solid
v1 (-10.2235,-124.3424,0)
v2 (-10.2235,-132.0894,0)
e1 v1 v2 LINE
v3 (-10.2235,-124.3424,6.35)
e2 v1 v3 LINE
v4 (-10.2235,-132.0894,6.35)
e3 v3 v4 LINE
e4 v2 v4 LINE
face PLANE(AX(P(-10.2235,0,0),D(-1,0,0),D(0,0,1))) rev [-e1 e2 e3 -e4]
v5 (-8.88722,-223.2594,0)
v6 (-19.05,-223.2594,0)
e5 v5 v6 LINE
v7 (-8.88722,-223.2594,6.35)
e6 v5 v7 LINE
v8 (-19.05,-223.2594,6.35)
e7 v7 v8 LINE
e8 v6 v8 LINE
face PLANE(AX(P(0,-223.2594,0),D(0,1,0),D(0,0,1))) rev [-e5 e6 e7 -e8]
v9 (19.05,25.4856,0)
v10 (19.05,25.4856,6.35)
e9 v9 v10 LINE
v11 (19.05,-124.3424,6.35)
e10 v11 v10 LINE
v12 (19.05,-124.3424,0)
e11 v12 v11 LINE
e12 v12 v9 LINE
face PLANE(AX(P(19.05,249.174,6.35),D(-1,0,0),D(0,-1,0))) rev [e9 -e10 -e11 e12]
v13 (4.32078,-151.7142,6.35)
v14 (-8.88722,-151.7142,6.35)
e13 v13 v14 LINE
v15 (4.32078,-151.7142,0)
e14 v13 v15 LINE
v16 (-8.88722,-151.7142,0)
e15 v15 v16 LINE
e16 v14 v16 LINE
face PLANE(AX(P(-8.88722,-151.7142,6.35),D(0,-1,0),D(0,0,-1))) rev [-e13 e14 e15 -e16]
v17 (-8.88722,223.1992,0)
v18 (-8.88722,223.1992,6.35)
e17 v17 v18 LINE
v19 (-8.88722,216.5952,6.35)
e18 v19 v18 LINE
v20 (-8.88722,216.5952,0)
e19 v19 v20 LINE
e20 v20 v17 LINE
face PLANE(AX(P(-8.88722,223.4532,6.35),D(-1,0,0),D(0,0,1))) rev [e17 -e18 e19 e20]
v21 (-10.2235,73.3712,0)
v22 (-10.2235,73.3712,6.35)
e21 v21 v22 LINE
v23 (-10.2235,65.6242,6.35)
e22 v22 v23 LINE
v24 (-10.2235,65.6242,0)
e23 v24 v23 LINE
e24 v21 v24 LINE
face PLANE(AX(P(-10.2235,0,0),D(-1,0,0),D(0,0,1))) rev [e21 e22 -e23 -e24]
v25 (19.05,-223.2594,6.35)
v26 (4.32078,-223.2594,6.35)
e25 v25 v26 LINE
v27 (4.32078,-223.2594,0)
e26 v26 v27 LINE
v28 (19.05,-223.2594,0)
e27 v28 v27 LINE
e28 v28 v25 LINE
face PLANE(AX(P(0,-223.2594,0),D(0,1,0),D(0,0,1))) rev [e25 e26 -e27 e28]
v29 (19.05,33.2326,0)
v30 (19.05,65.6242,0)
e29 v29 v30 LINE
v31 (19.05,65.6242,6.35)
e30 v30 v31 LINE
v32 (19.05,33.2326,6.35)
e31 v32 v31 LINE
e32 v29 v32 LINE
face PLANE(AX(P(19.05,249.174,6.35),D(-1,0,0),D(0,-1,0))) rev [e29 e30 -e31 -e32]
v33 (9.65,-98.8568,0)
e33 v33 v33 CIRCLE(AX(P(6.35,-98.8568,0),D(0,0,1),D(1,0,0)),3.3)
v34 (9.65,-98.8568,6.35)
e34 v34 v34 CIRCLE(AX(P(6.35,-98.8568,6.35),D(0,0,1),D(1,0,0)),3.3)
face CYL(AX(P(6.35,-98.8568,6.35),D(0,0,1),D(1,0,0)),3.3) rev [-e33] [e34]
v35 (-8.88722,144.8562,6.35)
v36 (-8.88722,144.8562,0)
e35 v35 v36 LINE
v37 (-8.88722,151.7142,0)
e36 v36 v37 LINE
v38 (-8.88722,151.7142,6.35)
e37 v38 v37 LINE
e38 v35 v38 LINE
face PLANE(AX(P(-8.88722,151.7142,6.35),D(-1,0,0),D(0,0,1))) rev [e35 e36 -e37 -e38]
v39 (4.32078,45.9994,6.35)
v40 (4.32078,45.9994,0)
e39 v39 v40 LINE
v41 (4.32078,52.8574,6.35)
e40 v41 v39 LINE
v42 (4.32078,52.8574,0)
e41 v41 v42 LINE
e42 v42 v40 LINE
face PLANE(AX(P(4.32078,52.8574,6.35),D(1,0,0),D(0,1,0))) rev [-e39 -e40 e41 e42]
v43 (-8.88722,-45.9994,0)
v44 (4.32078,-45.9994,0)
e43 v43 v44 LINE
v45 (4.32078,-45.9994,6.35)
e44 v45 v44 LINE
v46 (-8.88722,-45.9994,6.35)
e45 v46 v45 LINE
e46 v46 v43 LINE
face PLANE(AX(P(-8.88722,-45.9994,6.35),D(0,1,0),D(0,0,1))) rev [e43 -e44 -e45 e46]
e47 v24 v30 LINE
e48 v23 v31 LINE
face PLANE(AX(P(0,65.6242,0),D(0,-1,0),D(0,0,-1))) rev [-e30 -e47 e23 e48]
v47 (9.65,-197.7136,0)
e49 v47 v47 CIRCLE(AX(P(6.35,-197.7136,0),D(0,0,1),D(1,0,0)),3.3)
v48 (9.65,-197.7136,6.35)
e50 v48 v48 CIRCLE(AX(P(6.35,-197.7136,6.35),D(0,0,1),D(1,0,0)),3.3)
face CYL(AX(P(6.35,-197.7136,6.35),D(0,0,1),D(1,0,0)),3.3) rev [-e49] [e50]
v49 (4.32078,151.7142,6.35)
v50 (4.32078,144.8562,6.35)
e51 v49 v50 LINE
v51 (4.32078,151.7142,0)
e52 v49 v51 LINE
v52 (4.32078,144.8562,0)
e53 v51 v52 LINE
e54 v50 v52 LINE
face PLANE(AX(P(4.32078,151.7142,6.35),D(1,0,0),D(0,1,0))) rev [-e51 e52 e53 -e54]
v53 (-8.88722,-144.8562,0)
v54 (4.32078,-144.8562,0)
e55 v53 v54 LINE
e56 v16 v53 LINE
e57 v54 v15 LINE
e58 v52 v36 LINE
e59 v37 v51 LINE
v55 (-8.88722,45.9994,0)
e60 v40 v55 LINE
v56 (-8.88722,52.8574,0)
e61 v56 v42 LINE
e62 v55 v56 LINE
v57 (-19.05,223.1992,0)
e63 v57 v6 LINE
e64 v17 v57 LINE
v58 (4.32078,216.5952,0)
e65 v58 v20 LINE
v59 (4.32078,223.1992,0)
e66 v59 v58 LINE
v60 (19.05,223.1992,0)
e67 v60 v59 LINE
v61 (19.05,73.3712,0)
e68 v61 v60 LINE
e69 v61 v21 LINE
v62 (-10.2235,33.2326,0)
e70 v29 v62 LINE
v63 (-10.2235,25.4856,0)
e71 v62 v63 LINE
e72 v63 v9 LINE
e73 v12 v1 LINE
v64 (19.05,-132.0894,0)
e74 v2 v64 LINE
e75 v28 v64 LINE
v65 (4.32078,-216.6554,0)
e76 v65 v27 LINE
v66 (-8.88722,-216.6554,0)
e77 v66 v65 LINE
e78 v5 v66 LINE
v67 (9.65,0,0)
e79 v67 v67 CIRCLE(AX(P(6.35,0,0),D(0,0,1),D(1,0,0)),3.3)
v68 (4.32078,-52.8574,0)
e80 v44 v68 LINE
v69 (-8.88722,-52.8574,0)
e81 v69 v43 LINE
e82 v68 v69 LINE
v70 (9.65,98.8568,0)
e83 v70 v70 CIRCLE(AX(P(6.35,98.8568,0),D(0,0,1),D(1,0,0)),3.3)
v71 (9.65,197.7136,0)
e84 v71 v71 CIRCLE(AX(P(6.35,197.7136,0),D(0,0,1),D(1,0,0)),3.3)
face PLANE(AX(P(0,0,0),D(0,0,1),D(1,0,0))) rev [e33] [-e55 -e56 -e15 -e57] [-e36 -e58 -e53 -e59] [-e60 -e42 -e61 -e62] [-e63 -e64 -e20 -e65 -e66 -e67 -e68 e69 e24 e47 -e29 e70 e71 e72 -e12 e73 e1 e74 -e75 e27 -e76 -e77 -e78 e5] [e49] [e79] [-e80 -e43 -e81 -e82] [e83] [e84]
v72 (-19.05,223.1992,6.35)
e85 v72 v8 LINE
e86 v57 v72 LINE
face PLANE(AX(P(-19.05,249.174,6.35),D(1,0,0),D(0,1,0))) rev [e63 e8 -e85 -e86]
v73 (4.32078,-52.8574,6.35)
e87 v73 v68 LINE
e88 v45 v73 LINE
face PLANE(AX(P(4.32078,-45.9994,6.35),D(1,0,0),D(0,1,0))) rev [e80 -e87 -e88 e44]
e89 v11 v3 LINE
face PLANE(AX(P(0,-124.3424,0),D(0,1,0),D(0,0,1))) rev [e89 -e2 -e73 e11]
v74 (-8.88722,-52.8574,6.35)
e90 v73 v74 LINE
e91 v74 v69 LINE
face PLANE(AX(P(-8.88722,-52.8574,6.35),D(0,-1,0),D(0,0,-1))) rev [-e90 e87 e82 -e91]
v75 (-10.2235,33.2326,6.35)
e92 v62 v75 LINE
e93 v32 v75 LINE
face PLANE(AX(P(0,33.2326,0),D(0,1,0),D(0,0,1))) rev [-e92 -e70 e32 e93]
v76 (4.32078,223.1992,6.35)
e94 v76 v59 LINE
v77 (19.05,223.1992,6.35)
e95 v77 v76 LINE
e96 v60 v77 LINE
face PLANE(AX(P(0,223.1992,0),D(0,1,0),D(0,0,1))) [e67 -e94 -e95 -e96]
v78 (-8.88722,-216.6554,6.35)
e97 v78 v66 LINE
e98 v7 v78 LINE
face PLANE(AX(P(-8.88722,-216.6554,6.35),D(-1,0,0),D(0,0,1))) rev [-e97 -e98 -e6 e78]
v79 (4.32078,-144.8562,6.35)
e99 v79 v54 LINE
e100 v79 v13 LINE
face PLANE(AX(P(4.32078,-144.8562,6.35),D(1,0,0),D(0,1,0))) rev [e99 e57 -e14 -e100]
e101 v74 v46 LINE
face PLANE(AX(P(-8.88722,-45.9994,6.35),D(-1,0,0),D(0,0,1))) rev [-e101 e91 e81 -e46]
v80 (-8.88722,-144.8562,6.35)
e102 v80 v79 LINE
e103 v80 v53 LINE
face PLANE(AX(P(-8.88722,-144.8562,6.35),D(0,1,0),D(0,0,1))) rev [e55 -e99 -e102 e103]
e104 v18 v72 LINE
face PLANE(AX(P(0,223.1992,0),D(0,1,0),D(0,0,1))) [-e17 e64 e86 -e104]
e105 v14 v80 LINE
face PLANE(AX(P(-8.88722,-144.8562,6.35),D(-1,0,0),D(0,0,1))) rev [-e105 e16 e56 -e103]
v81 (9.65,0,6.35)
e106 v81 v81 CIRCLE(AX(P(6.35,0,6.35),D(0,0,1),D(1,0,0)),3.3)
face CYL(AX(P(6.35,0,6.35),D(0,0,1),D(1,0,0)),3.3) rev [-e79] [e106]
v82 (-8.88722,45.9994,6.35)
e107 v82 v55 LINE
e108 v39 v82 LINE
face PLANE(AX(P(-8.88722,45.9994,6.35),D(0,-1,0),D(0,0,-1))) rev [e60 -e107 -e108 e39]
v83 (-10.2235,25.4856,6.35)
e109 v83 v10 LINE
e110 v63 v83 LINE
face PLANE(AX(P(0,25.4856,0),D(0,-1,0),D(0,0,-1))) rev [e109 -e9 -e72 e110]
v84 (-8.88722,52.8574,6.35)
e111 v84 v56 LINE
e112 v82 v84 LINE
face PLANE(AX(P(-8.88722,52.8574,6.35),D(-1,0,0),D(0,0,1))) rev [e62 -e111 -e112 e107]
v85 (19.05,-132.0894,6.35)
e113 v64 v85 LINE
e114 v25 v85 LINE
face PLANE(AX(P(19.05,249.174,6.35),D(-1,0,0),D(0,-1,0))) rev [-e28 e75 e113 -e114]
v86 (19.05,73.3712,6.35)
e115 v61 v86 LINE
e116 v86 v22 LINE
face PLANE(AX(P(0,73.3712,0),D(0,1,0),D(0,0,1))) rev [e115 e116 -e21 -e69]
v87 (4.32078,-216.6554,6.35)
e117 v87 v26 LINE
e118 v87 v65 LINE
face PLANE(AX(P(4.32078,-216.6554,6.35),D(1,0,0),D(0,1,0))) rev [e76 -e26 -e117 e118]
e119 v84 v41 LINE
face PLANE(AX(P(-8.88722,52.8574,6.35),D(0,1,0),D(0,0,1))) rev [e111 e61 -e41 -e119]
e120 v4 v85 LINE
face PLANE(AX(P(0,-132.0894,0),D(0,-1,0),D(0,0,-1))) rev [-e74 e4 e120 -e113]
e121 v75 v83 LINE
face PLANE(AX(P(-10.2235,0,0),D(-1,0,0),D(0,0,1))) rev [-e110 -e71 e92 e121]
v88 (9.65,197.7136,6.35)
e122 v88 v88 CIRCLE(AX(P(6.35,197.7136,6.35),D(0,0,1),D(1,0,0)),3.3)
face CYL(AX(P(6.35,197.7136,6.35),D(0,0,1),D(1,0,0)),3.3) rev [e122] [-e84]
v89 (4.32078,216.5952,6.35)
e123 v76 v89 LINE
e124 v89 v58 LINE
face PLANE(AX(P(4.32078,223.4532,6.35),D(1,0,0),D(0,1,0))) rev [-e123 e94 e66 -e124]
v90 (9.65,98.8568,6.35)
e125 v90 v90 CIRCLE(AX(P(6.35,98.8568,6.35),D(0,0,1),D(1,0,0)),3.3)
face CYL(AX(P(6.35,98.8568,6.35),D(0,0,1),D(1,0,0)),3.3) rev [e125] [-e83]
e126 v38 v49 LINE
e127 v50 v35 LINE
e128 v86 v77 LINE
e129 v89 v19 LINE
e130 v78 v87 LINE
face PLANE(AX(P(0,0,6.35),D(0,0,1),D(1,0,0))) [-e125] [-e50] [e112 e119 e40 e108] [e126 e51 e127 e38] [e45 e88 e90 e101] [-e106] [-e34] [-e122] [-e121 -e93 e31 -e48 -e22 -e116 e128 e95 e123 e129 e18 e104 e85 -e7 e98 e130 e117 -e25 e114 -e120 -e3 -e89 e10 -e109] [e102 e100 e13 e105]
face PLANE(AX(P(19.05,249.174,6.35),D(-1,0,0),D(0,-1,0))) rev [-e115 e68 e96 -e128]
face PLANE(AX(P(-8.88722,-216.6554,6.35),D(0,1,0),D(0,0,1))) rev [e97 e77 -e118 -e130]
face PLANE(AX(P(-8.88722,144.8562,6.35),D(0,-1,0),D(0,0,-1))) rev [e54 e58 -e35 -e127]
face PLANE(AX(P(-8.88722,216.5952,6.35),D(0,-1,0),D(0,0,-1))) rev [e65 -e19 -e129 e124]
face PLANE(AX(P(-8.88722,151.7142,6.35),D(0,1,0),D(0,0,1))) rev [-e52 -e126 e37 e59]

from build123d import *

# Parameters (mm, degrees)
SKETCH1_W             = 38.1
SKETCH1_H             = 498.348
SKETCH1_R             = 3
BOSS_EXTRUDE1_DEPTH   = 6.35
M6_CLEARANCE_HOLE1_D  = 6.6
LPATTERN1_COUNT       = 3
LPATTERN1_PITCH       = 98.8568
LPATTERN1_COL_COUNT   = 3
LPATTERN1_COL_PITCH   = 98.8568
SKETCH4_W             = 26.9875
SKETCH4_H             = 3.175
SKETCH4_W_2           = 25.7175
CUT_EXTRUDE1_DEPTH    = 250.981813891
LPATTERN2_START       = -8.887219794
LPATTERN2_OUTLINE_W   = 6.858
LPATTERN2_OUTLINE_H   = 6.35
LPATTERN2_OUTLINE_W_2 = 6.604
LPATTERN2_DEPTH       = 13.208


# Read off the part's stored shape, not the designer's step: LPattern2
with BuildPart() as part:
    # Sketch1 → Boss-Extrude1 (new body)
    with BuildSketch(Plane.XY):
        Rectangle(SKETCH1_W, SKETCH1_H)
        with Locations((6.35, 0)):
            Circle(SKETCH1_R, mode=Mode.SUBTRACT)
    extrude(amount=BOSS_EXTRUDE1_DEPTH)

    # M6 Clearance Hole1 (through all)
    with Locations(Plane.XY.offset(6.35)):
        with Locations((6.35, 0)):
            m6_clearance_hole1 = Hole(M6_CLEARANCE_HOLE1_D / 2)

    # LPattern1: M6 Clearance Hole1 ×3
    with Locations(*[(0, -i * LPATTERN1_PITCH, 0) for i in range(1, LPATTERN1_COUNT)]):
        add(m6_clearance_hole1, mode=Mode.SUBTRACT)

    # LPattern1 col: M6 Clearance Hole1 ×3
    with Locations(*[(0, i * LPATTERN1_COL_PITCH, 0) for i in range(1, LPATTERN1_COL_COUNT)]):
        add(m6_clearance_hole1, mode=Mode.SUBTRACT)

    # Sketch4 → Cut-Extrude1 (cut, through all)
    with BuildSketch(Plane.XY.offset(6.35)):
        Polygon((-8.9535, -231.0064), (-8.9535, -223.2594), (-19.05, -223.2594), (-19.05, -249.174), (19.05, -249.174), (19.05, -231.0064), align=None)
        Polygon((19.05, -225.5454), (19.05, -223.2594), (-8.9535, -223.2594), (-8.9535, -231.0064), (19.05, -231.0064), (19.05, -228.7204), (-6.6675, -228.7204), (-6.6675, -225.5454), align=None)
        with Locations((5.55625, -128.2159)):
            Rectangle(SKETCH4_W, SKETCH4_H)
        Polygon((-10.2235, -132.0894), (19.05, -132.0894), (19.05, -129.8034), (-7.9375, -129.8034), (-7.9375, -126.6284), (19.05, -126.6284), (19.05, -124.3424), (-10.2235, -124.3424), align=None)
        with Locations((6.19125, -227.1329)):
            Rectangle(SKETCH4_W_2, SKETCH4_H)
        with Locations((5.55625, 29.3591)):
            Rectangle(SKETCH4_W, SKETCH4_H)
        Polygon((-10.2235, 25.4856), (19.05, 25.4856), (19.05, 27.7716), (-7.9375, 27.7716), (-7.9375, 30.9466), (19.05, 30.9466), (19.05, 33.2326), (-10.2235, 33.2326), align=None)
        Polygon((19.05, 71.0852), (19.05, 73.3712), (-10.2235, 73.3712), (-10.2235, 65.6242), (19.05, 65.6242), (19.05, 67.9102), (-7.9375, 67.9102), (-7.9375, 71.0852), align=None)
        with Locations((5.55625, 69.4977)):
            Rectangle(SKETCH4_W, SKETCH4_H)
        Polygon((-19.05, 249.174), (-19.05, 223.1992), (-10.2235, 223.1992), (-10.2235, 230.9462), (19.05, 230.9462), (19.05, 249.174), align=None)
        with Locations((5.55625, 227.0727)):
            Rectangle(SKETCH4_W, SKETCH4_H)
        Polygon((-10.2235, 230.9462), (-10.2235, 223.1992), (19.05, 223.1992), (19.05, 225.4852), (-7.9375, 225.4852), (-7.9375, 228.6602), (19.05, 228.6602), (19.05, 230.9462), align=None)
    extrude(amount=-CUT_EXTRUDE1_DEPTH, mode=Mode.SUBTRACT)

    # LPattern2 outline → LPattern2 (cut)
    with BuildSketch(Plane.YZ.offset(LPATTERN2_START)):
        with Locations((148.2852, 3.175)):
            Rectangle(LPATTERN2_OUTLINE_W, LPATTERN2_OUTLINE_H)
        with Locations((219.8972, 3.175)):
            Rectangle(LPATTERN2_OUTLINE_W_2, LPATTERN2_OUTLINE_H)
        with Locations((49.4284, 3.175)):
            Rectangle(LPATTERN2_OUTLINE_W, LPATTERN2_OUTLINE_H)
        with Locations((-49.4284, 3.175)):
            Rectangle(LPATTERN2_OUTLINE_W, LPATTERN2_OUTLINE_H)
        with Locations((-148.2852, 3.175)):
            Rectangle(LPATTERN2_OUTLINE_W, LPATTERN2_OUTLINE_H)
        with Locations((-219.9574, 3.175)):
            Rectangle(LPATTERN2_OUTLINE_W_2, LPATTERN2_OUTLINE_H)
    extrude(amount=LPATTERN2_DEPTH, mode=Mode.SUBTRACT)


solid = part.part
